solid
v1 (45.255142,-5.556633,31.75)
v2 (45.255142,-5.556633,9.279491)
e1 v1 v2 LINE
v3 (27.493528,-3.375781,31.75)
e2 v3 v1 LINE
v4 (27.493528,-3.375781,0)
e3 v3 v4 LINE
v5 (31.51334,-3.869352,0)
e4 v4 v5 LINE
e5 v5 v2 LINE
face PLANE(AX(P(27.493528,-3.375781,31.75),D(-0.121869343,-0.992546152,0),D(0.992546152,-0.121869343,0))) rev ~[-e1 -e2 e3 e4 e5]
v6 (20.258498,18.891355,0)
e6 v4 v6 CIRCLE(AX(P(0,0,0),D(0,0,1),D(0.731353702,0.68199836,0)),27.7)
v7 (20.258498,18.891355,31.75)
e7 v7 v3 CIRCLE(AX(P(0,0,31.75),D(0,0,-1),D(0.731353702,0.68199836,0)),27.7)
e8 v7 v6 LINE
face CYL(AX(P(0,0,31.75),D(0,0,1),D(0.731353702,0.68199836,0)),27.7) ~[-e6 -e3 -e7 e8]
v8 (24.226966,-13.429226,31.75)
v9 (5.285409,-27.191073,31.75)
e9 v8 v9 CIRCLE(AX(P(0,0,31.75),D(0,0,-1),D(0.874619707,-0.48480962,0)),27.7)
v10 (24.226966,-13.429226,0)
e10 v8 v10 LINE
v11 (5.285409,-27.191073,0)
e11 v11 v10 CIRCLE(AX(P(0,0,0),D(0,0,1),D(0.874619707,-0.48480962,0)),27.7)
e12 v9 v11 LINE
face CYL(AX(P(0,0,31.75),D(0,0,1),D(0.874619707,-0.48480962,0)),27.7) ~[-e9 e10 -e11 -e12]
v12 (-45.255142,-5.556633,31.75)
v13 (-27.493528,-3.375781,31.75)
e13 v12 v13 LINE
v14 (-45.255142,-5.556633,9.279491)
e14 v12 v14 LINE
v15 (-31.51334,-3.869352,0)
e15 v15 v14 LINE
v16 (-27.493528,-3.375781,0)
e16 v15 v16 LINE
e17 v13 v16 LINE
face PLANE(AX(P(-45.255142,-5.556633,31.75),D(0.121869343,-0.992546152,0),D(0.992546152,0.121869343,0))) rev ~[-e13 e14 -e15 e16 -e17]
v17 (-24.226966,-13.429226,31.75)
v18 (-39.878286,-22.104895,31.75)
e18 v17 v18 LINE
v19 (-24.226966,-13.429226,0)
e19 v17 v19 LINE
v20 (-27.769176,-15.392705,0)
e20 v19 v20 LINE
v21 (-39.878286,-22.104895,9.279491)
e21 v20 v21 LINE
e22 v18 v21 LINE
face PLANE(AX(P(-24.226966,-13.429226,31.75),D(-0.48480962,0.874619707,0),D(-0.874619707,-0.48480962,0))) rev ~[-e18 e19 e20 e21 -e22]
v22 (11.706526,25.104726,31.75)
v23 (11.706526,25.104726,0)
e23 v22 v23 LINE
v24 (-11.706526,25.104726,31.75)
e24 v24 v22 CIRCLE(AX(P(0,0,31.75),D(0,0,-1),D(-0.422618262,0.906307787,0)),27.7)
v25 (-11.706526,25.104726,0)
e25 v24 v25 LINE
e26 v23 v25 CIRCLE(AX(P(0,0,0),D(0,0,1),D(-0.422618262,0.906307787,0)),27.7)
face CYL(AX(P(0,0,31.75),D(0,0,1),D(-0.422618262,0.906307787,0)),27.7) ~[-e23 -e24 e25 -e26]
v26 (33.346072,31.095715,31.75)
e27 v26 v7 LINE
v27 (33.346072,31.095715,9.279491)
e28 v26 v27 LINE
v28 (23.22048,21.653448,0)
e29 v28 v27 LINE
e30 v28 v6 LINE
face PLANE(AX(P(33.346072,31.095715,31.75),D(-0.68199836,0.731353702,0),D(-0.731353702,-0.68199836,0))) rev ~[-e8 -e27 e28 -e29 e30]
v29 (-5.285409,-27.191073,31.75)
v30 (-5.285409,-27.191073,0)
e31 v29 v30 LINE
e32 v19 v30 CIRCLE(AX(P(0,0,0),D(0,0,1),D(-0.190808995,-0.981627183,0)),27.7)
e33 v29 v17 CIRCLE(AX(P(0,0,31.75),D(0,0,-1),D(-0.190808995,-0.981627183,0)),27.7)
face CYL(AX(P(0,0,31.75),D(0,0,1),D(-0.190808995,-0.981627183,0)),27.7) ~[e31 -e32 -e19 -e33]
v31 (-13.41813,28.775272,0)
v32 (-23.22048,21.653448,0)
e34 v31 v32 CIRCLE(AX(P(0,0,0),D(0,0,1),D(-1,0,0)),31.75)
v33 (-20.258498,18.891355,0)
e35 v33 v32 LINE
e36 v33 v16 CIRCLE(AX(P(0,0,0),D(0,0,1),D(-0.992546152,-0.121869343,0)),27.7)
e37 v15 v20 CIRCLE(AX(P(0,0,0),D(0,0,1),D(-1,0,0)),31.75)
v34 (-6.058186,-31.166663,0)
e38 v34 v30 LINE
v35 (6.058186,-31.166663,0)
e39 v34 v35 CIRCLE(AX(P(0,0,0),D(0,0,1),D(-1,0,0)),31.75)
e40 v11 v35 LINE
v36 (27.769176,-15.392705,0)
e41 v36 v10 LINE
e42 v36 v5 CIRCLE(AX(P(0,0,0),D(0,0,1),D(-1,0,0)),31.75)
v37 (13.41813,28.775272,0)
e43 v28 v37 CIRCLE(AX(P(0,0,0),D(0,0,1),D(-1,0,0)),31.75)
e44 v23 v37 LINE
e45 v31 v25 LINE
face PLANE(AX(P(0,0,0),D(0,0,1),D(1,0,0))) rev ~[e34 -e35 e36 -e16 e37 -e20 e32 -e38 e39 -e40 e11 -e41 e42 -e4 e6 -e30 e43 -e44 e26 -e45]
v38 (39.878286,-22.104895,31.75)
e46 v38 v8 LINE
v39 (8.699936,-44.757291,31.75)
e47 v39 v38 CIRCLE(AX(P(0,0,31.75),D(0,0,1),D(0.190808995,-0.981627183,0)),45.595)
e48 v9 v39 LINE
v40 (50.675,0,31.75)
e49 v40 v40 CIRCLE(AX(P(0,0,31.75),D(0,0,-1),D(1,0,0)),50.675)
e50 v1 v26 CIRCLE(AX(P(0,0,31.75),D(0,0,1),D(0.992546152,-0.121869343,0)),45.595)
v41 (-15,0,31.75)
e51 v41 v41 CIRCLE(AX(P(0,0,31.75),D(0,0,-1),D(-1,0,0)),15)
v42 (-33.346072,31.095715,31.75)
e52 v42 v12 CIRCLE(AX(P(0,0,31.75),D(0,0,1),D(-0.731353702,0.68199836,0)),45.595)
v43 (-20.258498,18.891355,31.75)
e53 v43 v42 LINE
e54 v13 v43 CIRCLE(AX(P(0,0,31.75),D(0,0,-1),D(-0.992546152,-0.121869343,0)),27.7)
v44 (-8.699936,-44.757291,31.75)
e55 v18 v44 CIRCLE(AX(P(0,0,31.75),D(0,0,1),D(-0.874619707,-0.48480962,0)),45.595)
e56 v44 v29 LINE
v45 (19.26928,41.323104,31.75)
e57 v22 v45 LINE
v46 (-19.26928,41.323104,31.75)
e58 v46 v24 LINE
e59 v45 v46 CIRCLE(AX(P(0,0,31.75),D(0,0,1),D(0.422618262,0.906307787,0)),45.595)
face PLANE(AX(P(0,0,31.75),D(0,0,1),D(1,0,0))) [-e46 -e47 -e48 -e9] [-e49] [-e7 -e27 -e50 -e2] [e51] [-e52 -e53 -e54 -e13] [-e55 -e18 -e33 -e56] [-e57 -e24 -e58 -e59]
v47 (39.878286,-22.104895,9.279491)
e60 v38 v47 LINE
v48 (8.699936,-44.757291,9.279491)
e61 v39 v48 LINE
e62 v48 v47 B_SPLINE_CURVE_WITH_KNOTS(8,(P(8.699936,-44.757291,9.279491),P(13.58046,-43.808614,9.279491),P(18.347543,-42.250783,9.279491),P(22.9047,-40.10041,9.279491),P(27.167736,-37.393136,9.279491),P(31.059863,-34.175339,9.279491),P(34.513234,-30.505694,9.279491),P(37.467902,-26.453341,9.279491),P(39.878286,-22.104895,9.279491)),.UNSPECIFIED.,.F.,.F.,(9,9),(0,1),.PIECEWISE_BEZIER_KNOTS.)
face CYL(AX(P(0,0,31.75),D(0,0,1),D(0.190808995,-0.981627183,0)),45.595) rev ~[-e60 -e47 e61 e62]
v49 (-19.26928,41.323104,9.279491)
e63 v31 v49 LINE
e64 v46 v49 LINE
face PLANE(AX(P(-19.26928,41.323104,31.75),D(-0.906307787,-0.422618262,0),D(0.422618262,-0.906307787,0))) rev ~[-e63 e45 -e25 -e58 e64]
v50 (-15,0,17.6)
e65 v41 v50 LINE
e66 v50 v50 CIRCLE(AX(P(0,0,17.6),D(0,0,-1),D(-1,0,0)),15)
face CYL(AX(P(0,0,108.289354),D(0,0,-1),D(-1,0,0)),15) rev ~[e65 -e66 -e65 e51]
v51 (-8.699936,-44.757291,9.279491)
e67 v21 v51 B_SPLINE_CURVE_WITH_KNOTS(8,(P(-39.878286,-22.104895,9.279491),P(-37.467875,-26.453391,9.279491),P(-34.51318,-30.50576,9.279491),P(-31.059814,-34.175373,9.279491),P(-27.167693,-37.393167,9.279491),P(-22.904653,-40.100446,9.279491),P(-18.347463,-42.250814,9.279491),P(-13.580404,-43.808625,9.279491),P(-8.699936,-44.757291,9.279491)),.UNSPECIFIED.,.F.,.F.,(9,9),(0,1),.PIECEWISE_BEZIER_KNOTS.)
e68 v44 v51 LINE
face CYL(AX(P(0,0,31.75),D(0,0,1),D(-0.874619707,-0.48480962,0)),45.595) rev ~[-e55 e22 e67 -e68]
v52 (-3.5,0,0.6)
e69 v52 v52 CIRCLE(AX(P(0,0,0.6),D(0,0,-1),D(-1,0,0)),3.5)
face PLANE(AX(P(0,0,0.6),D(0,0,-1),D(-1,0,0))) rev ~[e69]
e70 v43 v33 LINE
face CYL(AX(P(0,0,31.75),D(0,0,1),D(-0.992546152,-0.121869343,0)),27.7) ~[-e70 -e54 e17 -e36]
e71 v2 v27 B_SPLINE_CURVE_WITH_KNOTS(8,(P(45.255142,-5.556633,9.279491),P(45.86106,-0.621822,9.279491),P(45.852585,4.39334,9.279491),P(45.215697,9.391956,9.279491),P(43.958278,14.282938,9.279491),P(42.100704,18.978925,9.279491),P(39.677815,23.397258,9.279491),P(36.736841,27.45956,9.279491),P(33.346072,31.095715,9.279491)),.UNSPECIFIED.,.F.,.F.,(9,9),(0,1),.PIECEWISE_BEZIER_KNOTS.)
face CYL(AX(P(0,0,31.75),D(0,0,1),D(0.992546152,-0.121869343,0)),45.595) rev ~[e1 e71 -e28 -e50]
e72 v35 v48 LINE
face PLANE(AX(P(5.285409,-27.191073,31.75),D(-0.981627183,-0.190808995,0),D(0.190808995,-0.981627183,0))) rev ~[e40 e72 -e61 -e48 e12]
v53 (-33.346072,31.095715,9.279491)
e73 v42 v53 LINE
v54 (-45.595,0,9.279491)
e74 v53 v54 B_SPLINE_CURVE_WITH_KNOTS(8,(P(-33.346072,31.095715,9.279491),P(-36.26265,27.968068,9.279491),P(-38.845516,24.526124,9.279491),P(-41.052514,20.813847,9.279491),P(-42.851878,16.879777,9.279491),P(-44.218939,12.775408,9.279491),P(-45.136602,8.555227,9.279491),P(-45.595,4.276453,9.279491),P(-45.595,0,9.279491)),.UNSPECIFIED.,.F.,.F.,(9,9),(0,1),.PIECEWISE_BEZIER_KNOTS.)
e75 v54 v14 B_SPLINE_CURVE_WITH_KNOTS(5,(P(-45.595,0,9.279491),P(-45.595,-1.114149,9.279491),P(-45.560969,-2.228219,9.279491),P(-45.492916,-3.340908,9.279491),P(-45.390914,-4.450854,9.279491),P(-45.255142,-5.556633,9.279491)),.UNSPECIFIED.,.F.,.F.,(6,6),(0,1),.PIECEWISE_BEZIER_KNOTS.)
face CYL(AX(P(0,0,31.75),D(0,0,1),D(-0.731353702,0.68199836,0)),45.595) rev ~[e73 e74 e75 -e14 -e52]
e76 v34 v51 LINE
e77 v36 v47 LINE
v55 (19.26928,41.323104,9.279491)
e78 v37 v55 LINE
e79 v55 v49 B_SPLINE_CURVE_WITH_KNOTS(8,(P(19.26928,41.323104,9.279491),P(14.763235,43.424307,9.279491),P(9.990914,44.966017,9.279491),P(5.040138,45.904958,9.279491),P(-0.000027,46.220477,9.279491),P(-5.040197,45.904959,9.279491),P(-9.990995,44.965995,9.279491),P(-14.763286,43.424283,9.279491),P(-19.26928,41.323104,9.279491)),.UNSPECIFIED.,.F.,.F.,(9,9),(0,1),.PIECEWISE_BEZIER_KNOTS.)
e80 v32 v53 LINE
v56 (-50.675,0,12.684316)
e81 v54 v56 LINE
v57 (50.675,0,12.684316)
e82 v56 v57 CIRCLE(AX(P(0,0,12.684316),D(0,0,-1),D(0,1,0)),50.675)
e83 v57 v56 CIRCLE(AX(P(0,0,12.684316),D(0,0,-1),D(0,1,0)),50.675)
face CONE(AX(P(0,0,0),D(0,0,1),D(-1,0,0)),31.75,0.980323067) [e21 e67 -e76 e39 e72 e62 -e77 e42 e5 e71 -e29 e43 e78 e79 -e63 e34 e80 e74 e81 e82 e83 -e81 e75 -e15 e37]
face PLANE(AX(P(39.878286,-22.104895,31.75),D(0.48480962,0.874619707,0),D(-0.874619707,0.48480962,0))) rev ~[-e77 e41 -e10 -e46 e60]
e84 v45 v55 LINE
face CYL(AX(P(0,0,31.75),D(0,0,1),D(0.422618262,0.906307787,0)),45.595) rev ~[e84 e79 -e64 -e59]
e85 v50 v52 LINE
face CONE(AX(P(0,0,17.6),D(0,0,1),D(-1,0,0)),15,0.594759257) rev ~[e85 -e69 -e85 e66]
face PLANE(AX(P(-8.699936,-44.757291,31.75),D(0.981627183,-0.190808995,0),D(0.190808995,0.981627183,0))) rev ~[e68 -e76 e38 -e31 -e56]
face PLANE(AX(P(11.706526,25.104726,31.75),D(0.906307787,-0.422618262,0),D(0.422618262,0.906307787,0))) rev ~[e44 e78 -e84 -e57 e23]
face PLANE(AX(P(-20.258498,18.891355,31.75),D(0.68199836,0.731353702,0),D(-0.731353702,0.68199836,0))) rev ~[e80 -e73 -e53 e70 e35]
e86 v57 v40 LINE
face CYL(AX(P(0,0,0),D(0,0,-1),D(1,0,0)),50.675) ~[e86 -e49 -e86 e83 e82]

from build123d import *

# Parameters (mm, degrees)
F0_R      = 50.675
F1_DEPTH  = 95.25
F6_R      = 64.2548627896
F7_DEPTH  = 63.5
F10_DEPTH = 31.751


# Not quite as in the source:
# - a feature of the source that left no trace in its solid (it failed there, or was rolled back) is left out


with BuildPart() as f1:
    # F0 (on Top) → F1 (new body)
    with BuildSketch(Plane.XY):
        Circle(F0_R)
    extrude(amount=F1_DEPTH)

    # F2 (on Front) → F3 (revolve, cut)
    with BuildSketch(Plane.XZ):
        Polygon((-50.6984, 0), (-31.75, 0), (-50.6984, 12.7), align=None)
    revolve(axis=Axis((0, 0, 21.0587424167), (0, 0, 1)), mode=Mode.SUBTRACT)

    # F4 (on Front) → F5 (revolve, cut)
    with BuildSketch(Plane.XZ):
        Polygon((0, 0.6), (0, 108.2893535495), (-15, 108.2893535495), (-15, 17.6), (-3.5, 0.6), align=None)
    revolve(axis=Axis((0, 0, 54.4446767747), (0, 0, -1)), mode=Mode.SUBTRACT)

    # F6 (on face) → F7 (cut)
    with BuildSketch(Plane.XY.offset(95.25)):
        Circle(F6_R)
    extrude(amount=-F7_DEPTH, mode=Mode.SUBTRACT)

    # F9 (on face) → F10 (cut, through all)
    with BuildSketch(Plane.XY.offset(31.75)):
        with BuildLine():
            ThreePointArc((-11.7065258502, 25.1047257009), (0, 27.7), (11.7065258502, 25.1047257009))
            Line((11.7065258502, 25.1047257009), (19.2692796441, 41.3231035499))
            ThreePointArc((19.2692796441, 41.3231035499), (0, 45.595), (-19.2692796441, 41.3231035499))
            Line((-19.2692796441, 41.3231035499), (-11.7065258502, 25.1047257009))
        make_face()
        with BuildLine():
            ThreePointArc((-27.4935284005, -3.3757808123), (-26.3442655014, 8.5597707442), (-20.2584975349, 18.8913545737))
            Line((-20.2584975349, 18.8913545737), (-33.3460720253, 31.095715227))
            ThreePointArc((-33.3460720253, 31.095715227), (-43.3634218605, 14.0896298585), (-45.2551417841, -5.5566327126))
            Line((-45.2551417841, -5.5566327126), (-27.4935284005, -3.3757808123))
        make_face()
        with BuildLine():
            ThreePointArc((-5.2854091719, -27.1910729815), (-16.2816514885, -22.4097707442), (-24.2269658878, -13.4292264808))
            Line((-24.2269658878, -13.4292264808), (-39.878285547, -22.1048946351))
            ThreePointArc((-39.878285547, -22.1048946351), (-26.8000685783, -36.8871298585), (-8.6999361442, -44.7572914293))
            Line((-8.6999361442, -44.7572914293), (-5.2854091719, -27.1910729815))
        make_face()
        with BuildLine():
            ThreePointArc((24.2269658878, -13.4292264808), (16.2816514885, -22.4097707442), (5.2854091719, -27.1910729815))
            Line((5.2854091719, -27.1910729815), (8.6999361442, -44.7572914293))
            ThreePointArc((8.6999361442, -44.7572914293), (26.8000685783, -36.8871298585), (39.878285547, -22.1048946351))
            Line((39.878285547, -22.1048946351), (24.2269658878, -13.4292264808))
        make_face()
        with BuildLine():
            ThreePointArc((20.2584975349, 18.8913545737), (26.3442655014, 8.5597707442), (27.4935284005, -3.3757808123))
            Line((27.4935284005, -3.3757808123), (45.2551417841, -5.5566327126))
            ThreePointArc((45.2551417841, -5.5566327126), (43.3634218605, 14.0896298585), (33.3460720253, 31.095715227))
            Line((33.3460720253, 31.095715227), (20.2584975349, 18.8913545737))
        make_face()
    extrude(amount=-F10_DEPTH, mode=Mode.SUBTRACT)


solid = f1.part
